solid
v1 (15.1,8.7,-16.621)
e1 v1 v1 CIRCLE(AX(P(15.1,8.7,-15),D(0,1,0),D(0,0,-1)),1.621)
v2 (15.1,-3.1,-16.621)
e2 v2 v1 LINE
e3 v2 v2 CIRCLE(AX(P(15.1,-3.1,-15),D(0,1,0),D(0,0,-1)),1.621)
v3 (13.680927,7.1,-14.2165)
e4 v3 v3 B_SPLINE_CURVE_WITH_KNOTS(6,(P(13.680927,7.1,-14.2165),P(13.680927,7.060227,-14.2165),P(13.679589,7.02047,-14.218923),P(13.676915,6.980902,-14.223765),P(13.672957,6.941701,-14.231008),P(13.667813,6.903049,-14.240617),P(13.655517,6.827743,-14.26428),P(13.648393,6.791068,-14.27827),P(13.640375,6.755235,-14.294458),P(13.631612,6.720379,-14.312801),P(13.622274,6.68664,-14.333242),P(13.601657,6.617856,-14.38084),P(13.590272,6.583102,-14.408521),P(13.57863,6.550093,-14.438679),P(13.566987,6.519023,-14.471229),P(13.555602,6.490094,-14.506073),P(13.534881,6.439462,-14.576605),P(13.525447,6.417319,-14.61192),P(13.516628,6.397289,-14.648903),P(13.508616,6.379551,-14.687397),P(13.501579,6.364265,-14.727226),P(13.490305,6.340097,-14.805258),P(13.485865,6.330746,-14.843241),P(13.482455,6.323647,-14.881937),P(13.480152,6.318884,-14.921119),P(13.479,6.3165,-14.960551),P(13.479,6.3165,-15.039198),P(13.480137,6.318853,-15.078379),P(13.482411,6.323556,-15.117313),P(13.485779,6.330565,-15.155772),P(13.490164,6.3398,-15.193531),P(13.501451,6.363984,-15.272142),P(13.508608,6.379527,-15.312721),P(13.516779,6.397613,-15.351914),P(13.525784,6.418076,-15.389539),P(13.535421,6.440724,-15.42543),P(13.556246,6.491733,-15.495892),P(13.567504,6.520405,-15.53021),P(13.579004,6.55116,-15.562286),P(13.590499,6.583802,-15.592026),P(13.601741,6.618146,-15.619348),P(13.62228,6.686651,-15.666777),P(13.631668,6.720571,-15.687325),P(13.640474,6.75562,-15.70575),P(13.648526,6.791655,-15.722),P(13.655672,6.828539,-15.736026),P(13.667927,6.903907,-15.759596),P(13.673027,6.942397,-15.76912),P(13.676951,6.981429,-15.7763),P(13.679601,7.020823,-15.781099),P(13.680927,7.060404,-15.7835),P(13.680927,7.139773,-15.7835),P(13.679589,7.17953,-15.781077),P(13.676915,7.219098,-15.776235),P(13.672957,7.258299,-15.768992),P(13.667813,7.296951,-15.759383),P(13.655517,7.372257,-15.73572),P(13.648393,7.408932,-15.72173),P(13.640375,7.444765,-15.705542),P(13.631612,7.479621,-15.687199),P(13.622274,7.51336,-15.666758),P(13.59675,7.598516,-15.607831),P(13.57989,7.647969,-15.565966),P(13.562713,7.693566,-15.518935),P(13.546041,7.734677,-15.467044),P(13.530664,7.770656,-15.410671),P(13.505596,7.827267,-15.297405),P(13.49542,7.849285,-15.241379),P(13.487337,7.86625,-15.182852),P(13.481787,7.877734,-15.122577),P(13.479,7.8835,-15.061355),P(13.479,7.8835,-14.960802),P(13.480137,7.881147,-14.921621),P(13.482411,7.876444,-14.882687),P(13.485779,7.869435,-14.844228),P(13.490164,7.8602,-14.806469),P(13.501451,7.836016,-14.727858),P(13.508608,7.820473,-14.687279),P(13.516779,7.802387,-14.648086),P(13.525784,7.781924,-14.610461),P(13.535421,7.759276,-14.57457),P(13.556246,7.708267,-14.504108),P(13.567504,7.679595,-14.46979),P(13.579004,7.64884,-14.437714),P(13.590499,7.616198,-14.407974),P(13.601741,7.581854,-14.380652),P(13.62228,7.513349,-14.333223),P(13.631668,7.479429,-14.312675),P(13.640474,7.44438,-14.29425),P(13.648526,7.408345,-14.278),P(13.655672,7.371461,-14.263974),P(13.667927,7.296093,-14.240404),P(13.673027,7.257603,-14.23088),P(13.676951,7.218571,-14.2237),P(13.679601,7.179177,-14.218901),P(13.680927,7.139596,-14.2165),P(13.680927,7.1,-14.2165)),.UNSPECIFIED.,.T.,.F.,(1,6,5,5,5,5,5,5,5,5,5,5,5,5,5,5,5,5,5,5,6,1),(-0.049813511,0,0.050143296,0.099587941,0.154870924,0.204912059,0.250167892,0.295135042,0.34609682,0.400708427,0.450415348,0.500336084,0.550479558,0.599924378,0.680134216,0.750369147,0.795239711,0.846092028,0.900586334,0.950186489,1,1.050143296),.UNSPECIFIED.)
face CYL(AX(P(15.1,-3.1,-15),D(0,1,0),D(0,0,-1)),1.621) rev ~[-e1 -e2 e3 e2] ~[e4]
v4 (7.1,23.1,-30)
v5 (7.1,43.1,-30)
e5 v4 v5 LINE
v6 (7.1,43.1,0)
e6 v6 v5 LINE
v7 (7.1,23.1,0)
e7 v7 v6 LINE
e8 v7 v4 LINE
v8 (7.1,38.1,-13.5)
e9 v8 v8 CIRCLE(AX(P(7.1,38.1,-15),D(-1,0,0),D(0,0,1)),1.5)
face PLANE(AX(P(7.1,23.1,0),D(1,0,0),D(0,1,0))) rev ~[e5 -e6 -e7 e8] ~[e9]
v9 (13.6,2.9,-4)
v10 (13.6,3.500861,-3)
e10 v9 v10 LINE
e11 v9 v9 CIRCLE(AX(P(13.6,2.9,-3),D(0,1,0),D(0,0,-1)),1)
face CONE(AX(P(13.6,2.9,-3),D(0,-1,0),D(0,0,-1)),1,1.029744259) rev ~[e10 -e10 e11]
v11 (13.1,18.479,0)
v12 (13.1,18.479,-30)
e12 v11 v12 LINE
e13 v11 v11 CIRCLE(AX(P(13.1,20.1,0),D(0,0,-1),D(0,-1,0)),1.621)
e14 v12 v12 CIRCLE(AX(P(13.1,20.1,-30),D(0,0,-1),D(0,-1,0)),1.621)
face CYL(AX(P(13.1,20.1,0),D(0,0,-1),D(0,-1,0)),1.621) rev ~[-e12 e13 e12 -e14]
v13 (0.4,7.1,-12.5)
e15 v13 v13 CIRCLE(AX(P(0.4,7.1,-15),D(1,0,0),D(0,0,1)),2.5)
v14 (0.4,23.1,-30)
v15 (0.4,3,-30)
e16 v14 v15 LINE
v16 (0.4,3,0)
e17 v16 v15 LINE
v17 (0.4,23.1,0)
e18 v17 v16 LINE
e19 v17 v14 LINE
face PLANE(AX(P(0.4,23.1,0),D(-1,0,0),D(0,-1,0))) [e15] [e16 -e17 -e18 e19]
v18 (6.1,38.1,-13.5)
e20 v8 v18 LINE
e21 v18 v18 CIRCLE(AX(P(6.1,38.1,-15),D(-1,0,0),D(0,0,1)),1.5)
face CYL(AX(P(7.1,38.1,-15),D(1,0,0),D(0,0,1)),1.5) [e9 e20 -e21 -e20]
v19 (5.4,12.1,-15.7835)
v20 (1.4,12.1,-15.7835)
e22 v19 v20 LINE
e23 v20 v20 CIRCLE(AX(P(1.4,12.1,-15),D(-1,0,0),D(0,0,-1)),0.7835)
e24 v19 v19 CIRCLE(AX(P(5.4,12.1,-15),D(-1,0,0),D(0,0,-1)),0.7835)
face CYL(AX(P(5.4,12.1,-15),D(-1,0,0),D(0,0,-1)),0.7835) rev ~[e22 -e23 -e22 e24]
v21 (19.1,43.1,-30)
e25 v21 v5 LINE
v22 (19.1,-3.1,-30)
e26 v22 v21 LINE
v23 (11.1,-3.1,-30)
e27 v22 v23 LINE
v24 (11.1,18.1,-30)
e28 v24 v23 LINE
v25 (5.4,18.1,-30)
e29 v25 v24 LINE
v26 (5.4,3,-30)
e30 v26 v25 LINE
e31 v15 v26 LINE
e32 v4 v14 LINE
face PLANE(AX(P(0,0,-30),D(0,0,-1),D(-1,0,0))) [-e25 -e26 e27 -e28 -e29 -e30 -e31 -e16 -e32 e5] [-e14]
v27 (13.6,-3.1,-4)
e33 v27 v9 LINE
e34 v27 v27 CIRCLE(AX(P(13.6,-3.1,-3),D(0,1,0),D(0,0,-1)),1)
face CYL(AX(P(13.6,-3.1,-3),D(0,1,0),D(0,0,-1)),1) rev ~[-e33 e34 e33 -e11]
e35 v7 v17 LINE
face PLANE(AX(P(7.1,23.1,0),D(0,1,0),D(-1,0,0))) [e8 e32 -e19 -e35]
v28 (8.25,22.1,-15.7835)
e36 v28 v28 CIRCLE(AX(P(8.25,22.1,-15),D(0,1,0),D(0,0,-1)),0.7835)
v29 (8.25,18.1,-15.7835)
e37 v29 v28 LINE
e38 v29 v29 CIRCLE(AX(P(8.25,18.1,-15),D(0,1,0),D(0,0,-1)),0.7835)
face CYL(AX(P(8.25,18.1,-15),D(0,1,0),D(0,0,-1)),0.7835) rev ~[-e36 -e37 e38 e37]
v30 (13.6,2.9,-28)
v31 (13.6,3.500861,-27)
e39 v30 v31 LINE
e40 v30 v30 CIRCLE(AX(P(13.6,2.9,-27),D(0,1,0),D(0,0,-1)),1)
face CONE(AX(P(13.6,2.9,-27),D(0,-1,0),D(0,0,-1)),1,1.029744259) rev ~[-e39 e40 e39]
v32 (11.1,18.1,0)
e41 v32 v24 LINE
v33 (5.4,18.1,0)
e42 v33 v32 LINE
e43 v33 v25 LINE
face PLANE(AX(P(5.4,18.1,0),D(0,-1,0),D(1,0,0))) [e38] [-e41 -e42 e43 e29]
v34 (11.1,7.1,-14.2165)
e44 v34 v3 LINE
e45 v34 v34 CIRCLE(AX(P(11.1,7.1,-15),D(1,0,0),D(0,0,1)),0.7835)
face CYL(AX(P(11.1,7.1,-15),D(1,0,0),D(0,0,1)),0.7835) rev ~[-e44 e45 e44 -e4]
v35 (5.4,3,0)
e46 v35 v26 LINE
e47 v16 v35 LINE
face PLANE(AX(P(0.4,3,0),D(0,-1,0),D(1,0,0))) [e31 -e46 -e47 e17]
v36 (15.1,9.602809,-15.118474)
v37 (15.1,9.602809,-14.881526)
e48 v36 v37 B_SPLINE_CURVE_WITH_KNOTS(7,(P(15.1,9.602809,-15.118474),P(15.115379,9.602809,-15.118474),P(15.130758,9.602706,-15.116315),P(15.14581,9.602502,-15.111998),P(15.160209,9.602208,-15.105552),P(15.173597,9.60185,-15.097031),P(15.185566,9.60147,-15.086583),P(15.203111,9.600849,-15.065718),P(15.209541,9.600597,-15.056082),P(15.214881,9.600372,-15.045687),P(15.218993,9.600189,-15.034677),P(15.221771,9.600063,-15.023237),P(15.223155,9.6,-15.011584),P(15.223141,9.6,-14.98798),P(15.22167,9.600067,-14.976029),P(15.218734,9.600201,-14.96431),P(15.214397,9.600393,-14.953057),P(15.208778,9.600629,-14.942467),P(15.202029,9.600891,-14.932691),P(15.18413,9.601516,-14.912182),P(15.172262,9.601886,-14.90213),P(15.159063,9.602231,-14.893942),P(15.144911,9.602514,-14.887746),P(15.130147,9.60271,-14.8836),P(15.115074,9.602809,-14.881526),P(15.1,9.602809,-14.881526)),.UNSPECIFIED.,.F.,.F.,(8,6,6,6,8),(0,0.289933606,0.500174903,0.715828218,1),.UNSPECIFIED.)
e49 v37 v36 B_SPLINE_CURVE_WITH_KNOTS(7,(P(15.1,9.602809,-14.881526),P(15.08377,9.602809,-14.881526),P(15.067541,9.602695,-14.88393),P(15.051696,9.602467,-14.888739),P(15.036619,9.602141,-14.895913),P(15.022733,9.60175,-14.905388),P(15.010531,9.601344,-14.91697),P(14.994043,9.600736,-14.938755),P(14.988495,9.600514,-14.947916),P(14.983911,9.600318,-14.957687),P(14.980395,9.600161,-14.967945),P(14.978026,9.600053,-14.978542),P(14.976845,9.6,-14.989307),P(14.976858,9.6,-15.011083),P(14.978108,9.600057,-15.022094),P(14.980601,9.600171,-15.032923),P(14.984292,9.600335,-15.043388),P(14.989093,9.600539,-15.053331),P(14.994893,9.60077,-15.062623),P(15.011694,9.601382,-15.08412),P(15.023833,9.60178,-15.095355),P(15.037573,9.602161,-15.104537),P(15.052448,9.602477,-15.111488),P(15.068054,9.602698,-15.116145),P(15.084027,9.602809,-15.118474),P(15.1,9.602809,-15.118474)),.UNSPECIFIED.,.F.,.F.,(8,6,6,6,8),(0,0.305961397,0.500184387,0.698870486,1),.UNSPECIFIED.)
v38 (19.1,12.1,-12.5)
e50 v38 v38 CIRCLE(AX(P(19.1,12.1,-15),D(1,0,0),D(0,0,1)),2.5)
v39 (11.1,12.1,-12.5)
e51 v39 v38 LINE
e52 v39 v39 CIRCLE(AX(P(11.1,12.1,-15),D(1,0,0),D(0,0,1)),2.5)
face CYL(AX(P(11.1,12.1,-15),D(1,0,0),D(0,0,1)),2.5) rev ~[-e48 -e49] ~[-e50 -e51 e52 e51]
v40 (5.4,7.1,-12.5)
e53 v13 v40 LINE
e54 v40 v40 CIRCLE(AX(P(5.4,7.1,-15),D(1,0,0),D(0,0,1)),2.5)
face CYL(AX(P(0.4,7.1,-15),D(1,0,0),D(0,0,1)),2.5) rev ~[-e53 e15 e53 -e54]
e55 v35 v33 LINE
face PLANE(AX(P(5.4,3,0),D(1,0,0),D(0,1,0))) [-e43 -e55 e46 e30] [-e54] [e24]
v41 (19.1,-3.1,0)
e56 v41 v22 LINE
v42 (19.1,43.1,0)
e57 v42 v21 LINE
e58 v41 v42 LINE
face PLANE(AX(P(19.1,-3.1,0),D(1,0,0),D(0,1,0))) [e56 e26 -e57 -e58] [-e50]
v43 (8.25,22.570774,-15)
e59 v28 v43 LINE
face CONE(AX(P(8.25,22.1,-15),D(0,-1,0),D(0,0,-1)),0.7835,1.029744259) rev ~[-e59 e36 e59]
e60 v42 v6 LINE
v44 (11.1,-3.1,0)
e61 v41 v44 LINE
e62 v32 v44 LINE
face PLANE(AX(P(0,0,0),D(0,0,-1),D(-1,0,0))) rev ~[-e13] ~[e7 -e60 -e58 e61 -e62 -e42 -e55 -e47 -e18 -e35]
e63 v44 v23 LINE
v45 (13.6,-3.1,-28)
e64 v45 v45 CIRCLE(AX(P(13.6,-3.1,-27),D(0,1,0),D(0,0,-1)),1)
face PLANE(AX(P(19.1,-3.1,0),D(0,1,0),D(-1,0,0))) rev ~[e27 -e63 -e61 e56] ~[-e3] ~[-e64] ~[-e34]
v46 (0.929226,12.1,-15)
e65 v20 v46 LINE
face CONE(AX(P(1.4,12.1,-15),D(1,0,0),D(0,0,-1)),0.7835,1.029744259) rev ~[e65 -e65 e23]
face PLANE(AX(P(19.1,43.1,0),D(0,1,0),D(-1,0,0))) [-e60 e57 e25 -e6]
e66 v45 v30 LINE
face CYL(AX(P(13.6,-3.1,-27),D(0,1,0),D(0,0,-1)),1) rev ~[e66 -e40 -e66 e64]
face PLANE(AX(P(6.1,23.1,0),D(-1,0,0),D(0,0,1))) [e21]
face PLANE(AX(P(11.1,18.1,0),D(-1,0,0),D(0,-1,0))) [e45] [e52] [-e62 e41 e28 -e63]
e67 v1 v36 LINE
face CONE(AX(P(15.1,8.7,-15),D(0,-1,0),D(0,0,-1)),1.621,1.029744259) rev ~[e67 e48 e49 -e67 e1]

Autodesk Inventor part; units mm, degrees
ref_plane "YZ Plane" through (0, 0, 0) normal (1, 0, 0) x (0, 1, 0)
ref_plane "XZ Plane" through (0, 0, 0) normal (0, 1, 0) x (-1, 0, 0)
ref_plane "XY Plane" through (0, 0, 0) normal (0, 0, 1) x (1, 0, 0)
ref_plane "Arbeitsebene1" through (0, 0, 0) normal (0, 0, -1) x (-1, 0, 0)
sketch "Skizze1" plane through (0, 0, 0) normal (0, 0, -1) x (-1, 0, 0)
  line L0 (-9, -16) -> (-9, 16) construction
  line L1 (-9, 16) -> (-7.5, 16) construction
  line L2 (-7.5, -1) -> (-7.5, -16) construction
  line L3 (-11.1, -3.1) -> (-19.1, -3.1) construction
  line L4 (-19.1, -3.1) -> (-19.1, 43.1)
  line L5 (-19.1, 43.1) -> (-7.1, 43.1)
  line L6 (-7.1, 23.1) -> (-0.4, 23.1)
  line L7 (-0.4, 23.1) -> (-0.4, 3)
  line L8 (-0.4, 3) -> (-5.4, 3)
  line L9 (-5.4, 3) -> (-5.4, 18.1)
  line L10 (-5.4, 18.1) -> (-11.1, 18.1)
  line L11 (-11.1, 18.1) -> (-11.1, -3.1)
  line L12 (-19.1, -3.1) -> (-11.1, -3.1)
  line L13 (-11.1, -3.1) -> (-9, -3.1) construction
  line L14 (-9, 18.1) -> (-9, 16) construction
  line L15 (-7.5, 16) -> (-5.4, 16) construction
  line L16 (-7.1, 23.1) -> (-7.1, 43.1)
  point P0 (0, 0)
  dimension "d0" = 20
  dimension "d1" = 5
  dimension "d2" = 5
  dimension "d3" = 13
  dimension "d18" = 12
extrude "Extrusion1" add sketch "Skizze1" along normal blind 30
sketch "Skizze2" plane through (7.1, 23.1, 0) normal (-1, 0, 0) x (0, 0, 1)
  line L0 (0, 20) -> (-30, 20) projected
  line L1 (-15, 15) -> (-15, 20) construction
  circle A0 centre (-15, 15) radius 1.5
  point P0 (0, -23.1)
  point P1 (-15, 20)
  point P2 (-15, 20)
  dimension "d6" = 5
  dimension "d94" = 3
sketch "Skizze3" plane through (11.1, -3.1, 0) normal (0, -1, 0) x (1, 0, 0)
  circle A0 centre (4, -15) radius 2 construction
  point P0 (-11.1, 0)
hole "Katzeverbindung" at (15.1, -3.1, -15) direction (0, 1, 0) diameter 3.242 depth 11.8 tip angle 118 thread size "M4x0.7" class "6H" standard "ANSI Metric M Profile"
sketch "Skizze4" plane through (11.1, -3.1, 0) normal (0, -1, 0) x (1, 0, 0)
  circle A0 centre (2.5, -27) radius 1 projected
  circle A1 centre (2.5, -3) radius 1 projected
  point P0 (-11.1, 0)
hole "Zentrierbolzen" at (13.6, -3.1, -3) at (13.6, -3.1, -27) direction (0, 1, 0) diameter 2 depth 6 tip angle 118
sketch "Skizze5" plane through (0, 0, 0) normal (0, 0, 1) x (1, 0, 0)
  line L0 (19.1, 43.1) -> (19.1, -3.1) projected
  line L1 (7.1, 43.1) -> (19.1, 43.1) projected
  point P0 (0, 0)
  point P1 (13.1, 20.1)
  dimension "d92" = 6
  dimension "d93" = 23
hole "seilV" at (13.1, 20.1, 0) direction (0, 0, -1) diameter 3.242 end through all thread size "M4x0.7" class "6H" standard "ANSI Metric M Profile"
sketch "Skizze6" plane through (5.4, 18.1, 0) normal (0, -1, 0) x (1, 0, 0)
  line L0 (5.7, 0) -> (0, 0) construction
  line L1 (0, 0) -> (0, -30) construction
  line L2 (5.7, -30) -> (0, -30) construction
  line L3 (5.7, 0) -> (5.7, -30) construction
  line L4 (5.7, -15) -> (2.85, -15) construction
  line L5 (2.85, -15) -> (2.85, -30) construction
  line L6 (2.85, -15) -> (2.85, 0) construction
  line L7 (2.85, -15) -> (0, -15) construction
  line L8 (5.7, 0) -> (5.7, -30) construction
  point P0 (-5.4, 0)
hole "GLVV" at (8.25, 18.1, -15) direction (0, 1, 0) diameter 1.567 depth 4 tip angle 118 thread size "M2x0.4" class "6H" standard "ANSI Metric M Profile"
sketch "Skizze7" plane through (11.1, -3.1, 0) normal (-1, 0, 0) x (0, 0, 1)
  line L0 (-30, 19.2) -> (0, 19.2) construction
  line L1 (0, 0) -> (0, 21.2) construction
  line L2 (0, 21.2) -> (-30, 21.2) construction
  line L3 (-30, 0) -> (-30, 21.2) construction
  line L4 (0, 0) -> (-30, 0) construction
  line L5 (-30, 10.2) -> (-15, 10.2) construction
  line L6 (-15, 10.2) -> (0, 10.2) construction
  line L7 (-15, 10.2) -> (-15, 19.2) construction
  point P0 (0, 3.1)
  dimension "d62" = 9
hole "GLVO" at (11.1, 7.1, -15) direction (1, 0, 0) diameter 1.567 depth 4 tip angle 118 thread size "M2x0.4" class "6H" standard "ANSI Metric M Profile"
sketch "Skizze8" plane through (5.4, 3, 0) normal (1, 0, 0) x (0, 0, -1)
  line L0 (0, 15.1) -> (0, 0) construction
  line L1 (0, 0) -> (30, 0) construction
  line L2 (30, 15.1) -> (30, 0) construction
  line L3 (0, 15.1) -> (30, 15.1) construction
  line L4 (0, 13.1) -> (30, 13.1) construction
  line L5 (15, 9.1) -> (15, 13.1) construction
  line L6 (15, 9.1) -> (0, 9.1) construction
  line L7 (15, 9.1) -> (30, 9.1) construction
  line L8 (30, 15.1) -> (30, 0) construction
  point P0 (0, -3)
  dimension "d70" = 4
hole "GLVU" at (5.4, 12.1, -15) direction (-1, 0, 0) diameter 1.567 depth 4 tip angle 118 thread size "M2x0.4" class "6H" standard "ANSI Metric M Profile"
sketch "Skizze9" plane through (0.4, 3, 0) normal (-1, 0, 0) x (0, 0, 1)
  circle A0 centre (-15, 4.1) radius 1 projected
  point P0 (0, -3)
hole "DLVU" at (0.4, 7.1, -15) direction (1, 0, 0) diameter 5 depth 5
sketch "Skizze10" plane through (11.1, -3.1, 0) normal (-1, 0, 0) x (0, 0, 1)
  circle A0 centre (-15, 15.2) radius 0.7835 projected
  point P0 (0, 3.1)
hole "DLVO" at (11.1, 12.1, -15) direction (1, 0, 0) diameter 5 end through all
extrude "Extrusion2" add sketch "Skizze2" along normal blind 1
properties part number "Katze_Lagerhalter_vorne" material "Aluminium 6061, Katze"
